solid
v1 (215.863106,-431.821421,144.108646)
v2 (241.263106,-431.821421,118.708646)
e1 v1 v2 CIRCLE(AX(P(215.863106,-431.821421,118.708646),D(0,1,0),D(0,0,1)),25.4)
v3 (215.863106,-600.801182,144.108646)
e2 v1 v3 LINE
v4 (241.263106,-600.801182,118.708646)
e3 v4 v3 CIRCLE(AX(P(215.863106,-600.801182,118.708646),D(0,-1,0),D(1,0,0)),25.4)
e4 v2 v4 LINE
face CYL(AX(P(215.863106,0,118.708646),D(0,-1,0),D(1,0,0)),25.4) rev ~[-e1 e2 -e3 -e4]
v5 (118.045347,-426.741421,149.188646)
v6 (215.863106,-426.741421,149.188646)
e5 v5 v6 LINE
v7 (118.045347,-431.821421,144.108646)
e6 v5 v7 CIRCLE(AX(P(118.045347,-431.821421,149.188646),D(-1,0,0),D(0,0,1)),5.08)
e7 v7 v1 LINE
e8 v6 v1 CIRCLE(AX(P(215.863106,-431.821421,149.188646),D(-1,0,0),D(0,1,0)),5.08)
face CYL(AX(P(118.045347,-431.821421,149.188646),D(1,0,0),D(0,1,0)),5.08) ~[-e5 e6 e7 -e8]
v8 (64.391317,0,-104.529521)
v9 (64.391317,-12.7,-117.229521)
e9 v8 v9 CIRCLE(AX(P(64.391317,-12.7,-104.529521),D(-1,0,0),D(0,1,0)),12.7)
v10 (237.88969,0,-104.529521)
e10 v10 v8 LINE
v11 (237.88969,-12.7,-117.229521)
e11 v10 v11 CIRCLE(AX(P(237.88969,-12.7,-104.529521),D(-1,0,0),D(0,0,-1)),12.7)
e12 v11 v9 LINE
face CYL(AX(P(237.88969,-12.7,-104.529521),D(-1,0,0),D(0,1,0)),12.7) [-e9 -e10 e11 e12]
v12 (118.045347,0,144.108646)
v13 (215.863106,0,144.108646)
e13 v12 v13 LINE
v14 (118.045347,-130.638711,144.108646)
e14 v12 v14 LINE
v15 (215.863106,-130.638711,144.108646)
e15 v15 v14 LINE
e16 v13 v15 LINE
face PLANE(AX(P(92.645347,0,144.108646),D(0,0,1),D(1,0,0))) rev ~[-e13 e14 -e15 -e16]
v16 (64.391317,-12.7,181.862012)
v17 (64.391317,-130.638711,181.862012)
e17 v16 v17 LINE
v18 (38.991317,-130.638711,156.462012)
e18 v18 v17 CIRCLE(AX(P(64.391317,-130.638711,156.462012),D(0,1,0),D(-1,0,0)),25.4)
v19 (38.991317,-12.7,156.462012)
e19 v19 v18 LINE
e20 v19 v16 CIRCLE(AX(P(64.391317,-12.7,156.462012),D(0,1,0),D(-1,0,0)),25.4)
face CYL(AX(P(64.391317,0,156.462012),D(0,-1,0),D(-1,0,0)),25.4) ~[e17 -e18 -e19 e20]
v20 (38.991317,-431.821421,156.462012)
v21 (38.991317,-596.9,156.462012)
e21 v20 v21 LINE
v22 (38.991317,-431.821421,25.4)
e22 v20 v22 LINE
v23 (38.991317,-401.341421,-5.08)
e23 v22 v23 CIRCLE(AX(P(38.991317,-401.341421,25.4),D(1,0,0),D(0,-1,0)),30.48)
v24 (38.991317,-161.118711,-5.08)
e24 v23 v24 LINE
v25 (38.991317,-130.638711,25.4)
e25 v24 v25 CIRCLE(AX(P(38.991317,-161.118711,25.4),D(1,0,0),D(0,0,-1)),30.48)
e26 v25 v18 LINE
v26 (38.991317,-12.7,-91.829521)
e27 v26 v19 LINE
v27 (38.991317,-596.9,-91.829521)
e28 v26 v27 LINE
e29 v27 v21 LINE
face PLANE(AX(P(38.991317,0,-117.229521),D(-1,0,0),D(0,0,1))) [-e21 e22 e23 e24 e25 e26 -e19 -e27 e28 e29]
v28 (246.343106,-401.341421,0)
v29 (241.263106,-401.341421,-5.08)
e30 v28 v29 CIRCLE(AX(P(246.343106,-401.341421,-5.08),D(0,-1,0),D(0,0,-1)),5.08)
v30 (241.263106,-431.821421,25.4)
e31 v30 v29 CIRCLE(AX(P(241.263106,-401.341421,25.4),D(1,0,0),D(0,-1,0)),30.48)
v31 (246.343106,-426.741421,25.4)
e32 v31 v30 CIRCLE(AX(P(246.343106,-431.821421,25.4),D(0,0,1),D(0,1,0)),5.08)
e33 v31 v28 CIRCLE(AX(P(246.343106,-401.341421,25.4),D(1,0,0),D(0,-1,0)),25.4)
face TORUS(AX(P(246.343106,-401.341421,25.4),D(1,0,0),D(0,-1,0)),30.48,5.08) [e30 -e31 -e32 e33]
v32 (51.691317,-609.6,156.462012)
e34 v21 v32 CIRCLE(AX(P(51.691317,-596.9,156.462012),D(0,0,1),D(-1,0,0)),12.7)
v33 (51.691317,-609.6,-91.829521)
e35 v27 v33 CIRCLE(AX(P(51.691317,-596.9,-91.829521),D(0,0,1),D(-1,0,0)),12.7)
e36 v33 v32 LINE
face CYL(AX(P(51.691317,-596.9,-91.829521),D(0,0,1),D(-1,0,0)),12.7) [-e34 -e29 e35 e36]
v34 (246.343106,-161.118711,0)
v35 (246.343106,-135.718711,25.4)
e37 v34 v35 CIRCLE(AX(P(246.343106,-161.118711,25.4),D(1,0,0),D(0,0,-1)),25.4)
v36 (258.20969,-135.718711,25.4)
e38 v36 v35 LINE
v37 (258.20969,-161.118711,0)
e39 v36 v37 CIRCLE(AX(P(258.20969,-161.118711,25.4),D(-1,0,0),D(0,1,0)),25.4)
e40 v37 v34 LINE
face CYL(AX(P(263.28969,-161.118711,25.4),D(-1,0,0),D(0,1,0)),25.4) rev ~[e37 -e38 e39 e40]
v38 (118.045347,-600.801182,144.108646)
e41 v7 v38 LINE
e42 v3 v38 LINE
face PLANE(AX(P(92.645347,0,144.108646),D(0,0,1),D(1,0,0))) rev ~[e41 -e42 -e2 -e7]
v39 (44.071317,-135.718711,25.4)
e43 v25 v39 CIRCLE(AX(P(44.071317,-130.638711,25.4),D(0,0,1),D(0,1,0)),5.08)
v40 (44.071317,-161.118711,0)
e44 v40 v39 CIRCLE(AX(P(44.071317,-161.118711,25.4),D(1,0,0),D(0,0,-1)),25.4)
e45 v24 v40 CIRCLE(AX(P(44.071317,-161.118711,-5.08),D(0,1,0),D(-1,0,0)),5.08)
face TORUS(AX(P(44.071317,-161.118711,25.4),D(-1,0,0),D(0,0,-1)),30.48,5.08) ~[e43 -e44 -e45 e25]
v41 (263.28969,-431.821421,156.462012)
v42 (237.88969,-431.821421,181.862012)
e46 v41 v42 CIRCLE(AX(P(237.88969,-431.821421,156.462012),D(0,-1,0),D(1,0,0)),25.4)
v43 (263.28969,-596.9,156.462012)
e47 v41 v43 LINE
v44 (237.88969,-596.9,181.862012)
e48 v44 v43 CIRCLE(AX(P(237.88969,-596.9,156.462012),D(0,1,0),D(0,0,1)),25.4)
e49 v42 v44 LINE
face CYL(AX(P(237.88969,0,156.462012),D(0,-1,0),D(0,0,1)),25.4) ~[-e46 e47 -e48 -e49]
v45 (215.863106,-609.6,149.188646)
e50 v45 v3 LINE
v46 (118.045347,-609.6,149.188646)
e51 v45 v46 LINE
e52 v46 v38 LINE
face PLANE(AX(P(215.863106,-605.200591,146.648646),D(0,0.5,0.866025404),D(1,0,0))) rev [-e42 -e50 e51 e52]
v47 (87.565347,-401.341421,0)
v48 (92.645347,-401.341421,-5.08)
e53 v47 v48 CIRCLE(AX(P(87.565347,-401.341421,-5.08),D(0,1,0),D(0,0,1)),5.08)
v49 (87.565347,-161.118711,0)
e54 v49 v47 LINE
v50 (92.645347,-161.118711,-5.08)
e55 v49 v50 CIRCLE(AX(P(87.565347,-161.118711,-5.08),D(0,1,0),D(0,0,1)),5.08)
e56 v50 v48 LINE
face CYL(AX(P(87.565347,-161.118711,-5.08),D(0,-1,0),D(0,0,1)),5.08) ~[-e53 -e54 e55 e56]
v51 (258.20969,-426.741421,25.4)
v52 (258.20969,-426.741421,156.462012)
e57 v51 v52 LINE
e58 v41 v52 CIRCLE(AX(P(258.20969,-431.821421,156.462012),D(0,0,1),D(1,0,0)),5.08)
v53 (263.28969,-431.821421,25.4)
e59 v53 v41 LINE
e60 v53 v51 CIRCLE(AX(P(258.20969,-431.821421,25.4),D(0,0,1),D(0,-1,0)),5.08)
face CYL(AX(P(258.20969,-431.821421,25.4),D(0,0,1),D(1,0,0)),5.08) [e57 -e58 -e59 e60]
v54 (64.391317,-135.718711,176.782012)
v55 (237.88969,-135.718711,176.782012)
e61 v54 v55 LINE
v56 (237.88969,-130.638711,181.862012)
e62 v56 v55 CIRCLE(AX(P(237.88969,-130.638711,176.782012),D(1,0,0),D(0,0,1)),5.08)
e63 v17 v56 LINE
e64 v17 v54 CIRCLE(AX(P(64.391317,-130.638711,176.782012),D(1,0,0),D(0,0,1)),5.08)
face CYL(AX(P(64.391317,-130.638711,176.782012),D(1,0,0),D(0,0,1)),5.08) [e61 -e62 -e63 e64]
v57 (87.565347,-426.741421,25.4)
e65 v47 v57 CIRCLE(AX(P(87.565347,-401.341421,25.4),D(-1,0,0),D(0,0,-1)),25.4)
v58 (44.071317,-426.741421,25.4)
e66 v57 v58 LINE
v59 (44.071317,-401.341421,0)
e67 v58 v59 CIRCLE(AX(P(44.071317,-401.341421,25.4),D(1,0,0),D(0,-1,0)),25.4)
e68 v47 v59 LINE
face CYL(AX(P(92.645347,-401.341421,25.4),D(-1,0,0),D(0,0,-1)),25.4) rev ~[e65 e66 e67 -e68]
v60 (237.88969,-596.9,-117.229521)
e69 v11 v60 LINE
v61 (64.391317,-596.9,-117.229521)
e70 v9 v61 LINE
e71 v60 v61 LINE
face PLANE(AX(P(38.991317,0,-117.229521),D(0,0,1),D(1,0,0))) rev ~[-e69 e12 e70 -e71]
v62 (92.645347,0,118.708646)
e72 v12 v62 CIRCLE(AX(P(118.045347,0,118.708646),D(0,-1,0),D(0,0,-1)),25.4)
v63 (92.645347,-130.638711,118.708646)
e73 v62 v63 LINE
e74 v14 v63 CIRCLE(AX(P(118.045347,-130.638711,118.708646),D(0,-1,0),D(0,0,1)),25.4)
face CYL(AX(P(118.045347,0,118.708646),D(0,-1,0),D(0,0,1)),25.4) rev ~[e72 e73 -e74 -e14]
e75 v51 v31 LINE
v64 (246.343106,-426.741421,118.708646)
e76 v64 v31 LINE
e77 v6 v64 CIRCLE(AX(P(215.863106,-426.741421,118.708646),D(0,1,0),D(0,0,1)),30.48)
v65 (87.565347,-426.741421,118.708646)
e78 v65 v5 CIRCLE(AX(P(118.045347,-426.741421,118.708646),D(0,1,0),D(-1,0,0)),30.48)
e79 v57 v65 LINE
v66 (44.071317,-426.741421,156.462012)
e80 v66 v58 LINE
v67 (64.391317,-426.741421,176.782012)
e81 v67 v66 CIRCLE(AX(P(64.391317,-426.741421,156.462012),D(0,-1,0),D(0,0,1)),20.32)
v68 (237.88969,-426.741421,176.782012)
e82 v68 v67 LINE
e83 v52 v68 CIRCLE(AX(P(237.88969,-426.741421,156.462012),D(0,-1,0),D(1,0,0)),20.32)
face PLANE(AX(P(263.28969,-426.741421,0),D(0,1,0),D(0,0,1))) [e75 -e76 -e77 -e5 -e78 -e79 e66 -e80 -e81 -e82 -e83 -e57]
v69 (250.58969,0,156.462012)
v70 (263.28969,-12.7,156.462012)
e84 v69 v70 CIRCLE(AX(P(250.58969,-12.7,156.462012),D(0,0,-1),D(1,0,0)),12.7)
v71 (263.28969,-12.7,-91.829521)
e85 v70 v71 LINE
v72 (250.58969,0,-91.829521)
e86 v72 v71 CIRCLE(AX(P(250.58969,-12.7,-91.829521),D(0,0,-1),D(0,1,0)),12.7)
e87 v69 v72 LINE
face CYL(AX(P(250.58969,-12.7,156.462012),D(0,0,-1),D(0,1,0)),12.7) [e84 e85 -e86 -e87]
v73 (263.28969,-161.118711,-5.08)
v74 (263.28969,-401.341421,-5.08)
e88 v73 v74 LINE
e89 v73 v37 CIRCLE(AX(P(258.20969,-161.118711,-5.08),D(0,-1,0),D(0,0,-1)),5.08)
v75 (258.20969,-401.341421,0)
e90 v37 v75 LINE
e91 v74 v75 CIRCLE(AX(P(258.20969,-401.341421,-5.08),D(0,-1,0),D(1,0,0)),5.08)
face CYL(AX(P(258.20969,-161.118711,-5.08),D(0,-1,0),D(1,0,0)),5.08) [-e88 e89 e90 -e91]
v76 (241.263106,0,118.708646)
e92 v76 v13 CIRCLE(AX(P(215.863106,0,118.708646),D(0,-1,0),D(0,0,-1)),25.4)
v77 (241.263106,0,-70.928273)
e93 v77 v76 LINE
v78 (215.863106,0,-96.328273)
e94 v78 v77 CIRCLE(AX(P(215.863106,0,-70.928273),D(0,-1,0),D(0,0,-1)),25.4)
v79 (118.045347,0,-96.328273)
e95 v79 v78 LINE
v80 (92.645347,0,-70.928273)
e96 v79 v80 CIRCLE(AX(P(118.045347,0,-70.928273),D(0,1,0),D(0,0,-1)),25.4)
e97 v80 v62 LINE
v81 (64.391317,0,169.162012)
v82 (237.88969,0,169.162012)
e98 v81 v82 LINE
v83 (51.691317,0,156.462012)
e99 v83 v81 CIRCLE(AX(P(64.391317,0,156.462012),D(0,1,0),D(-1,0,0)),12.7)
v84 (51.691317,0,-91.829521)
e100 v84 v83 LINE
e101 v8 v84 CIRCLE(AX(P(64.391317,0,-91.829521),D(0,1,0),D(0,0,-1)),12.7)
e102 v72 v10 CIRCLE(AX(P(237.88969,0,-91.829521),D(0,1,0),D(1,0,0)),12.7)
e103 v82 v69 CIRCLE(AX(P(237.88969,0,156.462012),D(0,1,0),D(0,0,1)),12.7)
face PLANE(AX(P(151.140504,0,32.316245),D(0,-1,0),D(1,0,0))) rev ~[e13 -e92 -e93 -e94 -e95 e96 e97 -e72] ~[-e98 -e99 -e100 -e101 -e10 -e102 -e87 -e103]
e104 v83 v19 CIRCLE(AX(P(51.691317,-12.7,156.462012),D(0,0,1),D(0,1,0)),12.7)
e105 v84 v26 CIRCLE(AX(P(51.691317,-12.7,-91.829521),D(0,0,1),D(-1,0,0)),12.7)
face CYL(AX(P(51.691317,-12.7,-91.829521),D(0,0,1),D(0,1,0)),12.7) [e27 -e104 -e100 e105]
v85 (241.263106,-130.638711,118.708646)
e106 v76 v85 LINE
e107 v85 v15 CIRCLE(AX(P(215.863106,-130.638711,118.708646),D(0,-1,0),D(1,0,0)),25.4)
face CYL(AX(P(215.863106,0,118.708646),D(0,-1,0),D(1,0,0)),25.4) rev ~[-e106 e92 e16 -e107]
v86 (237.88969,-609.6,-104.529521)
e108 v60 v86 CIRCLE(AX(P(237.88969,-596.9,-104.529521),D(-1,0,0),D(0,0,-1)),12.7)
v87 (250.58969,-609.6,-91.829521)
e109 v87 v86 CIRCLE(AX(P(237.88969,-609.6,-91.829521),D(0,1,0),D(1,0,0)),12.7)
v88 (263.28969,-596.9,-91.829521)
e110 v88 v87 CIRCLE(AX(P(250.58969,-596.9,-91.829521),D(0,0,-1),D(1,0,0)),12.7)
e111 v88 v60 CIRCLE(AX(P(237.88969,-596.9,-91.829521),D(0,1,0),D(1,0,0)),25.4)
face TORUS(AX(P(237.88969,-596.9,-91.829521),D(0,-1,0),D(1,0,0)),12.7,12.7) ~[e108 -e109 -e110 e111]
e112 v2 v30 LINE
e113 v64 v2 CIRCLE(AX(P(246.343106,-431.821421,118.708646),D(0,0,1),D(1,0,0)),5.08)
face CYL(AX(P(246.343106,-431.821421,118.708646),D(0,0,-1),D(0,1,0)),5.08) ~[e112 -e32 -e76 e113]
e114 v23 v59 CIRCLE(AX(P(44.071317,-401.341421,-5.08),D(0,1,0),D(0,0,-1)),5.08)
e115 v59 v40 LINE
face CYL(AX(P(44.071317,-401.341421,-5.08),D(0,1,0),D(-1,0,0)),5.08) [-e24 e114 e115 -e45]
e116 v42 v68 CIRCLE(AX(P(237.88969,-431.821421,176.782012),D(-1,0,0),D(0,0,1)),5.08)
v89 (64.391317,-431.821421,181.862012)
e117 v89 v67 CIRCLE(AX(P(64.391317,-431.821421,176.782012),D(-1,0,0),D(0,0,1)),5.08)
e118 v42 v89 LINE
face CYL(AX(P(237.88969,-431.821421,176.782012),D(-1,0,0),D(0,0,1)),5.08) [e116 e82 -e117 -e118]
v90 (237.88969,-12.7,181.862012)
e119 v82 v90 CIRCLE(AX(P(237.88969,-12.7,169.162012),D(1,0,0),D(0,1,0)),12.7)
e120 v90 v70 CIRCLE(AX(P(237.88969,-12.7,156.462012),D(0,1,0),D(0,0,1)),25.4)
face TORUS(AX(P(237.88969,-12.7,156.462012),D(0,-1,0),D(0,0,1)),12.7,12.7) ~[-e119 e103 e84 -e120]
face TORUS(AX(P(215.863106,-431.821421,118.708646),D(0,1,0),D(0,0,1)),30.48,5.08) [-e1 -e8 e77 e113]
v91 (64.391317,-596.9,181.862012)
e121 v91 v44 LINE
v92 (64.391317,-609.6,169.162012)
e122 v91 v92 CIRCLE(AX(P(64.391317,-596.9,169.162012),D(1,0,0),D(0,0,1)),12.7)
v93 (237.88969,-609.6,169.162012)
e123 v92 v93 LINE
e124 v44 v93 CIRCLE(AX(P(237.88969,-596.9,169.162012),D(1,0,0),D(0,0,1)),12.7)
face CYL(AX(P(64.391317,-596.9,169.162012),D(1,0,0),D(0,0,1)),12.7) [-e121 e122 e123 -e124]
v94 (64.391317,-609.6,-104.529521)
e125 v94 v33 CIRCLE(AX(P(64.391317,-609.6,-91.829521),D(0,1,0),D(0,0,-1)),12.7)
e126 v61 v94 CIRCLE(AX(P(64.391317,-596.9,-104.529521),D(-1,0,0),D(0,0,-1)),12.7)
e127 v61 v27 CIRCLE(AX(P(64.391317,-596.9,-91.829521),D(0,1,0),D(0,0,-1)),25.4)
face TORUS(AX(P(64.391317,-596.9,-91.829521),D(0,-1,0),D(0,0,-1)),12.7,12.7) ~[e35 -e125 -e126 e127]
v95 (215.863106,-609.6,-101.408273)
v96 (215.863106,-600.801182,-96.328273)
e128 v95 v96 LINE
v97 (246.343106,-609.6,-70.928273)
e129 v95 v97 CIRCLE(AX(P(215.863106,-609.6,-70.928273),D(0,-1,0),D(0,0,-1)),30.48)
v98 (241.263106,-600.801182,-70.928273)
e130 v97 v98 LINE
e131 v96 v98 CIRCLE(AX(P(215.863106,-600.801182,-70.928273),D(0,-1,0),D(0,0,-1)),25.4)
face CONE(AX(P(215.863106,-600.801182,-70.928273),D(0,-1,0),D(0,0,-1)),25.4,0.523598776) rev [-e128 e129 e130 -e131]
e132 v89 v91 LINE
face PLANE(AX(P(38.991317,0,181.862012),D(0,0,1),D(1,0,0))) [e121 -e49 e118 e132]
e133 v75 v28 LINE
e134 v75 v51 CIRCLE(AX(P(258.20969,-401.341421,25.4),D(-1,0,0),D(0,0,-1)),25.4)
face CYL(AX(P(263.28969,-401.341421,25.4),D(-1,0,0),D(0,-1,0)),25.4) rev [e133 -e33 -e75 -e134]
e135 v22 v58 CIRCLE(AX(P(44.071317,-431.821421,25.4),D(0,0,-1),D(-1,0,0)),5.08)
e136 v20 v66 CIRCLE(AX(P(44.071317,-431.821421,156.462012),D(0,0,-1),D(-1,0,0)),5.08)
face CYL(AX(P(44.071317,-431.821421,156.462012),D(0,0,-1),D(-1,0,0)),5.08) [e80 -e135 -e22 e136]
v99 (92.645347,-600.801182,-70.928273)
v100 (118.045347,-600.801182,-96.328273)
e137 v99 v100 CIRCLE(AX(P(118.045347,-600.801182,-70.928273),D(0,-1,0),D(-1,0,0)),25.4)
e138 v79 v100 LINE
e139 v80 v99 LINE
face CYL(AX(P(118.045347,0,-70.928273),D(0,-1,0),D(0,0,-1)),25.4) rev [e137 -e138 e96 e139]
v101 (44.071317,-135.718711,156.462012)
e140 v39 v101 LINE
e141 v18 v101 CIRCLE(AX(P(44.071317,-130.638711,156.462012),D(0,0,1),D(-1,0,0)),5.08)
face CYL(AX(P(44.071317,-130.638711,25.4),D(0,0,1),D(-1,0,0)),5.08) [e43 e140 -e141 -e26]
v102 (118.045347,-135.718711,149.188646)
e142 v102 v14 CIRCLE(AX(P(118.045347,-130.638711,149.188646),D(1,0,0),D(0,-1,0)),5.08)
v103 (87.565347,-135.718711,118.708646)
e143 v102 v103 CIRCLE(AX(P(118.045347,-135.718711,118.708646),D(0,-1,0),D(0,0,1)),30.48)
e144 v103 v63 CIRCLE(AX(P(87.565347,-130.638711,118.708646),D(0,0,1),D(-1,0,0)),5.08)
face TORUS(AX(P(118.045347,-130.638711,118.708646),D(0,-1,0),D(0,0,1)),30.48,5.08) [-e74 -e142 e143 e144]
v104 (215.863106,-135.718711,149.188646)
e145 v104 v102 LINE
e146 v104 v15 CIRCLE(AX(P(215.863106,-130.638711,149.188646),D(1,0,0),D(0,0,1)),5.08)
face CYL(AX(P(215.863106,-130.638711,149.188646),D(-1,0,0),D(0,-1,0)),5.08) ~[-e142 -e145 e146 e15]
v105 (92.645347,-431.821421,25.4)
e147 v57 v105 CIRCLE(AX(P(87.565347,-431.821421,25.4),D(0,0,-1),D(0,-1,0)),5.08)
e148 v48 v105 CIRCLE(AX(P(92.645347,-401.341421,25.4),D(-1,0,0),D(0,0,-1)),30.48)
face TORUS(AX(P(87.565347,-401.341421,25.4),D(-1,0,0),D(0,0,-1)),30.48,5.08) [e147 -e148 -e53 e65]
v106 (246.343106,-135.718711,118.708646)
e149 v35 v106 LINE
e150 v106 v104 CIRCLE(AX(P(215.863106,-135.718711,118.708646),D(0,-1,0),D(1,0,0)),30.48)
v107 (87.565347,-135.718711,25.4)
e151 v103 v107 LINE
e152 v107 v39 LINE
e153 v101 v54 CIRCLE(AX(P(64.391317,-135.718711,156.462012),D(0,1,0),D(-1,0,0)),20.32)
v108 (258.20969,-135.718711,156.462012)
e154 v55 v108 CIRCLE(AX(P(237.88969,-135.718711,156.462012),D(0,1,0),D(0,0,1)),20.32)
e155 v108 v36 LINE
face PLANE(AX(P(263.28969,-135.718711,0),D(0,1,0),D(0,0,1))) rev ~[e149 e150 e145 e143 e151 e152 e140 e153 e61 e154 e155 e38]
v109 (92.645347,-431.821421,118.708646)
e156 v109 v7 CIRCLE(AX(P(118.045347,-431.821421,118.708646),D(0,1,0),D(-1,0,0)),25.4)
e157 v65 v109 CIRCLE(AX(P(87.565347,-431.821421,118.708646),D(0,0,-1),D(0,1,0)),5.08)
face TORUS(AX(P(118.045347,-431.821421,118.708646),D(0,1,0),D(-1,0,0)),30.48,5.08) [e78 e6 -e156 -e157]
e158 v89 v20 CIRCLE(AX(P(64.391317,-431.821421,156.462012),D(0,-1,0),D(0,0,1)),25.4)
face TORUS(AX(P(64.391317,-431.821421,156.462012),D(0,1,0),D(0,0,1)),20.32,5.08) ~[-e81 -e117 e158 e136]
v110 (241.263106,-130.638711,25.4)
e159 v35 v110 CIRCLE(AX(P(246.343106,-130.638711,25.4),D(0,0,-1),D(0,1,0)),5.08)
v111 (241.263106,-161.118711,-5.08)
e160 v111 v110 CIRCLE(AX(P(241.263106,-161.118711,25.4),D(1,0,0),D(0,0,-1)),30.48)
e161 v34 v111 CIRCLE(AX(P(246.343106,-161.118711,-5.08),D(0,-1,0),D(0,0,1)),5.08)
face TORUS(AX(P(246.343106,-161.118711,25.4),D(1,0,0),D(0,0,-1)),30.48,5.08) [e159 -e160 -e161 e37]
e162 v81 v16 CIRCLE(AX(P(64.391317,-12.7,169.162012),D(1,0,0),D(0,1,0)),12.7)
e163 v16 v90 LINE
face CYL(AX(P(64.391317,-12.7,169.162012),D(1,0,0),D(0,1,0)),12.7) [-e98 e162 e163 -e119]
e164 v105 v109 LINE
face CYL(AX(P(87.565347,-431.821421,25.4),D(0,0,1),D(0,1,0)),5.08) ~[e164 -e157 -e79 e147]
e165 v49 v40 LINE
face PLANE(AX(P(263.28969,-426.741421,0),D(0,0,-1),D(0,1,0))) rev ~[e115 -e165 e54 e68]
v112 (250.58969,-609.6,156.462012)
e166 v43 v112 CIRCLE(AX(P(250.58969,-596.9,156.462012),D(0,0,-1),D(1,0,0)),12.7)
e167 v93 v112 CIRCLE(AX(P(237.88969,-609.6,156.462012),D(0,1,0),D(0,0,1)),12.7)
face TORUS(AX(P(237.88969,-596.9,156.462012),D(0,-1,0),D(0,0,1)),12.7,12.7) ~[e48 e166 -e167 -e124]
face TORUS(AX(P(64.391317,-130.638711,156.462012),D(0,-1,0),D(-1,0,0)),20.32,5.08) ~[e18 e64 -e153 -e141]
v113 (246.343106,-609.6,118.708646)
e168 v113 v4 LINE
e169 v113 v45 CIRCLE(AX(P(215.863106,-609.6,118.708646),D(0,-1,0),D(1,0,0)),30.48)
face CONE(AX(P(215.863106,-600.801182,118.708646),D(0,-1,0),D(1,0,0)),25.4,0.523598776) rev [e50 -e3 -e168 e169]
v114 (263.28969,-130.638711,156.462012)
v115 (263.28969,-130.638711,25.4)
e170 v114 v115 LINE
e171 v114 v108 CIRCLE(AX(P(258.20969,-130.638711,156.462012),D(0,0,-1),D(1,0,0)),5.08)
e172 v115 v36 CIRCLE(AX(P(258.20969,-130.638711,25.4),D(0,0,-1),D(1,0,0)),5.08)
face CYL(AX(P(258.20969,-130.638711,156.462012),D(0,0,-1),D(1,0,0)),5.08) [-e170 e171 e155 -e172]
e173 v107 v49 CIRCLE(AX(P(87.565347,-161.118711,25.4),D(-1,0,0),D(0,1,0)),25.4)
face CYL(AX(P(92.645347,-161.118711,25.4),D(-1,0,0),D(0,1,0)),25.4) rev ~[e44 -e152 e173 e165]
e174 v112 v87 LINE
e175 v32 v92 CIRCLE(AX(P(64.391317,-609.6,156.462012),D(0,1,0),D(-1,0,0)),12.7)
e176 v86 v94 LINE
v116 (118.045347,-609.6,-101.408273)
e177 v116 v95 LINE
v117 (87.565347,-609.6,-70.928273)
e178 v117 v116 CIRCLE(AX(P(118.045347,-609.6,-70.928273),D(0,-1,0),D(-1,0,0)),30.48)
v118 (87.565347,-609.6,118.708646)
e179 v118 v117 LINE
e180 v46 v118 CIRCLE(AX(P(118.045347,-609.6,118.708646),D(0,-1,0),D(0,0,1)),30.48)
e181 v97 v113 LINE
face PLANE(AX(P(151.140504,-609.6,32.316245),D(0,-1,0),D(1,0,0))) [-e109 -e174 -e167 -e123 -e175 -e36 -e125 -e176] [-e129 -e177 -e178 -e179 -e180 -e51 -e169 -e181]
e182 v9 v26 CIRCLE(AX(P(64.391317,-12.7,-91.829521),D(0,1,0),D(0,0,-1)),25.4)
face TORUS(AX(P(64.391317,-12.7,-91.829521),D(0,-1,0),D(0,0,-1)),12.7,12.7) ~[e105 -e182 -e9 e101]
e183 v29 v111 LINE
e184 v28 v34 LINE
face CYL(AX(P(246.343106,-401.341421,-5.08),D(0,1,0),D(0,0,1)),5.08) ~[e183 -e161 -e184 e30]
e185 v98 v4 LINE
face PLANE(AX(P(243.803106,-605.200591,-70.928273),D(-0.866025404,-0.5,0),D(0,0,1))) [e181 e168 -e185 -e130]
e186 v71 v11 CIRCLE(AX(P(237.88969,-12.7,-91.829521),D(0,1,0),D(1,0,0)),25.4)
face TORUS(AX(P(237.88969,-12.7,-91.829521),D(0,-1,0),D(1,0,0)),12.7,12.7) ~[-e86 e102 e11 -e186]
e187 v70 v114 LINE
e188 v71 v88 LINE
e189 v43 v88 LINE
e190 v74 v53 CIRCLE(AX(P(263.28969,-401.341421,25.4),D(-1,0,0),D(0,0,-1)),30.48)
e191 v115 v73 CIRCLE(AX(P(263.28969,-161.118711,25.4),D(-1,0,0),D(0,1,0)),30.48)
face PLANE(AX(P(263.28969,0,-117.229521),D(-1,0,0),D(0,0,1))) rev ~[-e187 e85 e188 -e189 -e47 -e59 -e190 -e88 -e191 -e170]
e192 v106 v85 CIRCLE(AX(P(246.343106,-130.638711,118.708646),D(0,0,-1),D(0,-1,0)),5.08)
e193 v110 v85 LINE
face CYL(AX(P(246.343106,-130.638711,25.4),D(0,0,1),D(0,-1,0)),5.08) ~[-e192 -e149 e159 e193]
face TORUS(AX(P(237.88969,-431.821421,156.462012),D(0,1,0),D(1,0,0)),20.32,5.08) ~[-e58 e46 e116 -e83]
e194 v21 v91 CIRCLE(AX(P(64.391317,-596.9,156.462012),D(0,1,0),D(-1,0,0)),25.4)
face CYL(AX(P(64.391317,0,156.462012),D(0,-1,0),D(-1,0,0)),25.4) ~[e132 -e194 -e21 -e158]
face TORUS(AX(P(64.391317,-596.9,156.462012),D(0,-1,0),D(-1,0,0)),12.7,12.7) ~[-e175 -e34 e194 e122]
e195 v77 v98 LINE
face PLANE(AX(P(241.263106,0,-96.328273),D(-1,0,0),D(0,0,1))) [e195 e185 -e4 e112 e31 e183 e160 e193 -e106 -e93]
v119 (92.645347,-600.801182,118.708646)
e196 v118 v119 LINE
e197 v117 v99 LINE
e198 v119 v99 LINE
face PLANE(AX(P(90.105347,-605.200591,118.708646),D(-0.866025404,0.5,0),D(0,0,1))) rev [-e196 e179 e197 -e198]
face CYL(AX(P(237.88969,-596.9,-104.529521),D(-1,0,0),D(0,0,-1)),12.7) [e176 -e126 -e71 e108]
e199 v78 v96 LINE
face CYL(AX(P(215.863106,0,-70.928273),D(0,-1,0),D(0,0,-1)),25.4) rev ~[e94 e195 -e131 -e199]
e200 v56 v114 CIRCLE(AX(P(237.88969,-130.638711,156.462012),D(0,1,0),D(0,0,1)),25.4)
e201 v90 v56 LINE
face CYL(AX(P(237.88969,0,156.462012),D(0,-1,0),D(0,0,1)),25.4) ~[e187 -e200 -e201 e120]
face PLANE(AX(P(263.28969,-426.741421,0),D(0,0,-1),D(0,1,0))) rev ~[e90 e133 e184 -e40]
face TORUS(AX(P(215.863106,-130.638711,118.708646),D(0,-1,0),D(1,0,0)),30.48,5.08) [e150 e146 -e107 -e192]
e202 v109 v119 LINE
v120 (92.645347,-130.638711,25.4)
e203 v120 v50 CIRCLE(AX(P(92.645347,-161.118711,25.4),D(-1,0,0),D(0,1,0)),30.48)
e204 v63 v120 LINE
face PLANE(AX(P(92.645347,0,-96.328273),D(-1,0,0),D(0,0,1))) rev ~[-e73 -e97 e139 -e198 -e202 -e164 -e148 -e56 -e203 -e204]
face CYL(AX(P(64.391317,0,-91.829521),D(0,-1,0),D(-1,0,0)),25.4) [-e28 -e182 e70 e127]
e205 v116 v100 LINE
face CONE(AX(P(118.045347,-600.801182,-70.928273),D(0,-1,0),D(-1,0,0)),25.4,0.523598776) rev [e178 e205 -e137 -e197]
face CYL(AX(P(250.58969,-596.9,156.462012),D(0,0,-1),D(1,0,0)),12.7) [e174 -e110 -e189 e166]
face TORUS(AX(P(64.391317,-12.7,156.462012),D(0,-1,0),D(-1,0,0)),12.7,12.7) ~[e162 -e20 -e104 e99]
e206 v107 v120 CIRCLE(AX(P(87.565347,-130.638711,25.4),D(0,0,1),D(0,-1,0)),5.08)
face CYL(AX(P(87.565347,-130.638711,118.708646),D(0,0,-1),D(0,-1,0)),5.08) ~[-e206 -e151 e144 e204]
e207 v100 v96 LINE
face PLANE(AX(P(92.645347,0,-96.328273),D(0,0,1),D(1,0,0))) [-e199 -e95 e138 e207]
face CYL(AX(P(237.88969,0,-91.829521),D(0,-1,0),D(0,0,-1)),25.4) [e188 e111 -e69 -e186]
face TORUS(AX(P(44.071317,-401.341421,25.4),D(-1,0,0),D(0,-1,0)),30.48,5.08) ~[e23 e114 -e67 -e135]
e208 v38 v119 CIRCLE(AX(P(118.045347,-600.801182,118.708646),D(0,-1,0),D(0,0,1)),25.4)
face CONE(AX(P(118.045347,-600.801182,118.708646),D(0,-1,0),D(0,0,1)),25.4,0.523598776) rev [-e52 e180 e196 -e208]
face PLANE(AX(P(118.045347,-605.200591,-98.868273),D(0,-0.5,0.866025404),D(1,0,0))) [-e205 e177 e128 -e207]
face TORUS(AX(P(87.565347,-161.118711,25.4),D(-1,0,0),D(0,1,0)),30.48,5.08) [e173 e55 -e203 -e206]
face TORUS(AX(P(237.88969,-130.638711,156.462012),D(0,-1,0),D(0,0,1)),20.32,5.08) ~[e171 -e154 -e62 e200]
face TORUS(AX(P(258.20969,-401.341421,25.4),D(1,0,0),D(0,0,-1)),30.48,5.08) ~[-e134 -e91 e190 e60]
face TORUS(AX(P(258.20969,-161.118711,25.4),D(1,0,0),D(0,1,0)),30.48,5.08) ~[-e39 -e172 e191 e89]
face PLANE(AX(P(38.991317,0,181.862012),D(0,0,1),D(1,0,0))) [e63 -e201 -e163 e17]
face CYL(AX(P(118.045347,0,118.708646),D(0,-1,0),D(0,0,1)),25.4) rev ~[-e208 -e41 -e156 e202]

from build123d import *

# Parameters (mm, degrees)
F0_W      = 224.2983728647
F0_H      = 299.0915328264
F0_W_2    = 148.617759347
F0_H_2    = 240.4369190335
F1_DEPTH  = 609.6
F2_R      = 25.4
F3_R      = 25.4
F4_R      = 12.7
F5_R      = 12.7
F6_W      = 291.0227105021
F6_H      = 387.5585496426
F7_DEPTH  = 1050
F8_R      = 25.4
F9_R      = 5.08
F10_SIZE2 = 8.7988181024
F10_SIZE  = 5.08


# Not quite as in the source:
# - an extrude ends at something that could not be found from the text; its depth is read off the source's solid


with BuildPart() as f1:
    # F0 (on Front) → F1 (new body)
    with BuildSketch(Plane.XZ):
        with Locations((151.1405035853, 32.3162451386)):
            Rectangle(F0_W, F0_H)
        with Locations((166.9542267919, 23.8901861012)):
            Rectangle(F0_W_2, F0_H_2, mode=Mode.SUBTRACT)
    extrude(amount=F1_DEPTH)

    # F2
    f2_edges = [f1.edges().sort_by_distance(p)[0] for p in [
        (92.645347, -304.8, -96.328273),
        (241.263106, -304.8, -96.328273),
        (92.645347, -304.8, 144.108646),
        (241.263106, -304.8, 144.108646),
    ]]
    fillet(f2_edges, radius=F2_R)

    # F3
    f3_edges = [f1.edges().sort_by_distance(p)[0] for p in [
        (263.28969, -304.8, 181.862012),
        (38.991317, -304.8, 181.862012),
        (263.28969, -304.8, -117.229521),
        (38.991317, -304.8, -117.229521),
    ]]
    fillet(f3_edges, radius=F3_R)

    # F4
    f4_edges = [f1.edges().sort_by_distance(p)[0] for p in [
        (151.140504, -609.6, 181.862012),
    ]]
    fillet(f4_edges, radius=F4_R)

    # F5
    f5_edges = [f1.edges().sort_by_distance(p)[0] for p in [
        (151.140504, 0, 181.862012),
        (38.991317, 0, 32.316245),
        (46.430805, 0, 174.422524),
        (46.430805, 0, -109.790034),
        (151.140504, 0, -117.229521),
        (255.850202, 0, 174.422524),
        (255.850202, 0, -109.790034),
        (263.28969, 0, 32.316245),
    ]]
    fillet(f5_edges, radius=F5_R)

    # F6 (on face) → F7 (cut, through all)
    with BuildSketch(Plane.YZ.offset(263.2896900177)):
        with Locations((-281.2300659716, 193.7792748213)):
            Rectangle(F6_W, F6_H)
    extrude(amount=-F7_DEPTH, mode=Mode.SUBTRACT)

    # F8
    f8_edges = [f1.edges().sort_by_distance(p)[0] for p in [
        (65.818332, -135.718711, 0),
        (252.276398, -135.718711, 0),
        (65.818332, -426.741421, 0),
        (252.276398, -426.741421, 0),
    ]]
    fillet(f8_edges, radius=F8_R)

    # F9
    f9_edges = [f1.edges().sort_by_distance(p)[0] for p in [
        (92.645347, -281.230066, 0),
        (38.991317, -426.741421, 90.931006),
        (38.991317, -419.301933, 7.439488),
        (38.991317, -281.230066, 0),
        (38.991317, -143.158198, 7.439488),
        (38.991317, -135.718711, 90.931006),
        (263.28969, -426.741421, 90.931006),
        (255.850202, -426.741421, 174.422524),
        (241.263106, -426.741421, 72.054323),
        (151.140504, -426.741421, 181.862012),
        (233.823619, -426.741421, 136.669158),
        (46.430805, -426.741421, 174.422524),
        (166.954227, -426.741421, 144.108646),
        (100.084835, -426.741421, 136.669158),
        (92.645347, -426.741421, 72.054323),
        (92.645347, -419.301933, 7.439488),
        (92.645347, -143.158198, 7.439488),
        (263.28969, -135.718711, 90.931006),
        (255.850202, -135.718711, 174.422524),
        (241.263106, -135.718711, 72.054323),
        (151.140504, -135.718711, 181.862012),
        (233.823619, -135.718711, 136.669158),
        (46.430805, -135.718711, 174.422524),
        (166.954227, -135.718711, 144.108646),
        (100.084835, -135.718711, 136.669158),
        (92.645347, -135.718711, 72.054323),
        (263.28969, -143.158198, 7.439488),
        (263.28969, -281.230066, 0),
        (263.28969, -419.301933, 7.439488),
        (241.263106, -419.301933, 7.439488),
        (241.263106, -281.230066, 0),
        (241.263106, -143.158198, 7.439488),
    ]]
    fillet(f9_edges, radius=F9_R)

    # F10
    f10_edges = [f1.edges().sort_by_distance(p)[0] for p in [
        (166.954227, -609.6, -96.328273),
    ]]
    f10_side = f1.faces().sort_by_distance((151.140504, -609.6, 165.778705))[0]
    chamfer(f10_edges, length=F10_SIZE, length2=F10_SIZE2, reference=f10_side)


solid = f1.part
